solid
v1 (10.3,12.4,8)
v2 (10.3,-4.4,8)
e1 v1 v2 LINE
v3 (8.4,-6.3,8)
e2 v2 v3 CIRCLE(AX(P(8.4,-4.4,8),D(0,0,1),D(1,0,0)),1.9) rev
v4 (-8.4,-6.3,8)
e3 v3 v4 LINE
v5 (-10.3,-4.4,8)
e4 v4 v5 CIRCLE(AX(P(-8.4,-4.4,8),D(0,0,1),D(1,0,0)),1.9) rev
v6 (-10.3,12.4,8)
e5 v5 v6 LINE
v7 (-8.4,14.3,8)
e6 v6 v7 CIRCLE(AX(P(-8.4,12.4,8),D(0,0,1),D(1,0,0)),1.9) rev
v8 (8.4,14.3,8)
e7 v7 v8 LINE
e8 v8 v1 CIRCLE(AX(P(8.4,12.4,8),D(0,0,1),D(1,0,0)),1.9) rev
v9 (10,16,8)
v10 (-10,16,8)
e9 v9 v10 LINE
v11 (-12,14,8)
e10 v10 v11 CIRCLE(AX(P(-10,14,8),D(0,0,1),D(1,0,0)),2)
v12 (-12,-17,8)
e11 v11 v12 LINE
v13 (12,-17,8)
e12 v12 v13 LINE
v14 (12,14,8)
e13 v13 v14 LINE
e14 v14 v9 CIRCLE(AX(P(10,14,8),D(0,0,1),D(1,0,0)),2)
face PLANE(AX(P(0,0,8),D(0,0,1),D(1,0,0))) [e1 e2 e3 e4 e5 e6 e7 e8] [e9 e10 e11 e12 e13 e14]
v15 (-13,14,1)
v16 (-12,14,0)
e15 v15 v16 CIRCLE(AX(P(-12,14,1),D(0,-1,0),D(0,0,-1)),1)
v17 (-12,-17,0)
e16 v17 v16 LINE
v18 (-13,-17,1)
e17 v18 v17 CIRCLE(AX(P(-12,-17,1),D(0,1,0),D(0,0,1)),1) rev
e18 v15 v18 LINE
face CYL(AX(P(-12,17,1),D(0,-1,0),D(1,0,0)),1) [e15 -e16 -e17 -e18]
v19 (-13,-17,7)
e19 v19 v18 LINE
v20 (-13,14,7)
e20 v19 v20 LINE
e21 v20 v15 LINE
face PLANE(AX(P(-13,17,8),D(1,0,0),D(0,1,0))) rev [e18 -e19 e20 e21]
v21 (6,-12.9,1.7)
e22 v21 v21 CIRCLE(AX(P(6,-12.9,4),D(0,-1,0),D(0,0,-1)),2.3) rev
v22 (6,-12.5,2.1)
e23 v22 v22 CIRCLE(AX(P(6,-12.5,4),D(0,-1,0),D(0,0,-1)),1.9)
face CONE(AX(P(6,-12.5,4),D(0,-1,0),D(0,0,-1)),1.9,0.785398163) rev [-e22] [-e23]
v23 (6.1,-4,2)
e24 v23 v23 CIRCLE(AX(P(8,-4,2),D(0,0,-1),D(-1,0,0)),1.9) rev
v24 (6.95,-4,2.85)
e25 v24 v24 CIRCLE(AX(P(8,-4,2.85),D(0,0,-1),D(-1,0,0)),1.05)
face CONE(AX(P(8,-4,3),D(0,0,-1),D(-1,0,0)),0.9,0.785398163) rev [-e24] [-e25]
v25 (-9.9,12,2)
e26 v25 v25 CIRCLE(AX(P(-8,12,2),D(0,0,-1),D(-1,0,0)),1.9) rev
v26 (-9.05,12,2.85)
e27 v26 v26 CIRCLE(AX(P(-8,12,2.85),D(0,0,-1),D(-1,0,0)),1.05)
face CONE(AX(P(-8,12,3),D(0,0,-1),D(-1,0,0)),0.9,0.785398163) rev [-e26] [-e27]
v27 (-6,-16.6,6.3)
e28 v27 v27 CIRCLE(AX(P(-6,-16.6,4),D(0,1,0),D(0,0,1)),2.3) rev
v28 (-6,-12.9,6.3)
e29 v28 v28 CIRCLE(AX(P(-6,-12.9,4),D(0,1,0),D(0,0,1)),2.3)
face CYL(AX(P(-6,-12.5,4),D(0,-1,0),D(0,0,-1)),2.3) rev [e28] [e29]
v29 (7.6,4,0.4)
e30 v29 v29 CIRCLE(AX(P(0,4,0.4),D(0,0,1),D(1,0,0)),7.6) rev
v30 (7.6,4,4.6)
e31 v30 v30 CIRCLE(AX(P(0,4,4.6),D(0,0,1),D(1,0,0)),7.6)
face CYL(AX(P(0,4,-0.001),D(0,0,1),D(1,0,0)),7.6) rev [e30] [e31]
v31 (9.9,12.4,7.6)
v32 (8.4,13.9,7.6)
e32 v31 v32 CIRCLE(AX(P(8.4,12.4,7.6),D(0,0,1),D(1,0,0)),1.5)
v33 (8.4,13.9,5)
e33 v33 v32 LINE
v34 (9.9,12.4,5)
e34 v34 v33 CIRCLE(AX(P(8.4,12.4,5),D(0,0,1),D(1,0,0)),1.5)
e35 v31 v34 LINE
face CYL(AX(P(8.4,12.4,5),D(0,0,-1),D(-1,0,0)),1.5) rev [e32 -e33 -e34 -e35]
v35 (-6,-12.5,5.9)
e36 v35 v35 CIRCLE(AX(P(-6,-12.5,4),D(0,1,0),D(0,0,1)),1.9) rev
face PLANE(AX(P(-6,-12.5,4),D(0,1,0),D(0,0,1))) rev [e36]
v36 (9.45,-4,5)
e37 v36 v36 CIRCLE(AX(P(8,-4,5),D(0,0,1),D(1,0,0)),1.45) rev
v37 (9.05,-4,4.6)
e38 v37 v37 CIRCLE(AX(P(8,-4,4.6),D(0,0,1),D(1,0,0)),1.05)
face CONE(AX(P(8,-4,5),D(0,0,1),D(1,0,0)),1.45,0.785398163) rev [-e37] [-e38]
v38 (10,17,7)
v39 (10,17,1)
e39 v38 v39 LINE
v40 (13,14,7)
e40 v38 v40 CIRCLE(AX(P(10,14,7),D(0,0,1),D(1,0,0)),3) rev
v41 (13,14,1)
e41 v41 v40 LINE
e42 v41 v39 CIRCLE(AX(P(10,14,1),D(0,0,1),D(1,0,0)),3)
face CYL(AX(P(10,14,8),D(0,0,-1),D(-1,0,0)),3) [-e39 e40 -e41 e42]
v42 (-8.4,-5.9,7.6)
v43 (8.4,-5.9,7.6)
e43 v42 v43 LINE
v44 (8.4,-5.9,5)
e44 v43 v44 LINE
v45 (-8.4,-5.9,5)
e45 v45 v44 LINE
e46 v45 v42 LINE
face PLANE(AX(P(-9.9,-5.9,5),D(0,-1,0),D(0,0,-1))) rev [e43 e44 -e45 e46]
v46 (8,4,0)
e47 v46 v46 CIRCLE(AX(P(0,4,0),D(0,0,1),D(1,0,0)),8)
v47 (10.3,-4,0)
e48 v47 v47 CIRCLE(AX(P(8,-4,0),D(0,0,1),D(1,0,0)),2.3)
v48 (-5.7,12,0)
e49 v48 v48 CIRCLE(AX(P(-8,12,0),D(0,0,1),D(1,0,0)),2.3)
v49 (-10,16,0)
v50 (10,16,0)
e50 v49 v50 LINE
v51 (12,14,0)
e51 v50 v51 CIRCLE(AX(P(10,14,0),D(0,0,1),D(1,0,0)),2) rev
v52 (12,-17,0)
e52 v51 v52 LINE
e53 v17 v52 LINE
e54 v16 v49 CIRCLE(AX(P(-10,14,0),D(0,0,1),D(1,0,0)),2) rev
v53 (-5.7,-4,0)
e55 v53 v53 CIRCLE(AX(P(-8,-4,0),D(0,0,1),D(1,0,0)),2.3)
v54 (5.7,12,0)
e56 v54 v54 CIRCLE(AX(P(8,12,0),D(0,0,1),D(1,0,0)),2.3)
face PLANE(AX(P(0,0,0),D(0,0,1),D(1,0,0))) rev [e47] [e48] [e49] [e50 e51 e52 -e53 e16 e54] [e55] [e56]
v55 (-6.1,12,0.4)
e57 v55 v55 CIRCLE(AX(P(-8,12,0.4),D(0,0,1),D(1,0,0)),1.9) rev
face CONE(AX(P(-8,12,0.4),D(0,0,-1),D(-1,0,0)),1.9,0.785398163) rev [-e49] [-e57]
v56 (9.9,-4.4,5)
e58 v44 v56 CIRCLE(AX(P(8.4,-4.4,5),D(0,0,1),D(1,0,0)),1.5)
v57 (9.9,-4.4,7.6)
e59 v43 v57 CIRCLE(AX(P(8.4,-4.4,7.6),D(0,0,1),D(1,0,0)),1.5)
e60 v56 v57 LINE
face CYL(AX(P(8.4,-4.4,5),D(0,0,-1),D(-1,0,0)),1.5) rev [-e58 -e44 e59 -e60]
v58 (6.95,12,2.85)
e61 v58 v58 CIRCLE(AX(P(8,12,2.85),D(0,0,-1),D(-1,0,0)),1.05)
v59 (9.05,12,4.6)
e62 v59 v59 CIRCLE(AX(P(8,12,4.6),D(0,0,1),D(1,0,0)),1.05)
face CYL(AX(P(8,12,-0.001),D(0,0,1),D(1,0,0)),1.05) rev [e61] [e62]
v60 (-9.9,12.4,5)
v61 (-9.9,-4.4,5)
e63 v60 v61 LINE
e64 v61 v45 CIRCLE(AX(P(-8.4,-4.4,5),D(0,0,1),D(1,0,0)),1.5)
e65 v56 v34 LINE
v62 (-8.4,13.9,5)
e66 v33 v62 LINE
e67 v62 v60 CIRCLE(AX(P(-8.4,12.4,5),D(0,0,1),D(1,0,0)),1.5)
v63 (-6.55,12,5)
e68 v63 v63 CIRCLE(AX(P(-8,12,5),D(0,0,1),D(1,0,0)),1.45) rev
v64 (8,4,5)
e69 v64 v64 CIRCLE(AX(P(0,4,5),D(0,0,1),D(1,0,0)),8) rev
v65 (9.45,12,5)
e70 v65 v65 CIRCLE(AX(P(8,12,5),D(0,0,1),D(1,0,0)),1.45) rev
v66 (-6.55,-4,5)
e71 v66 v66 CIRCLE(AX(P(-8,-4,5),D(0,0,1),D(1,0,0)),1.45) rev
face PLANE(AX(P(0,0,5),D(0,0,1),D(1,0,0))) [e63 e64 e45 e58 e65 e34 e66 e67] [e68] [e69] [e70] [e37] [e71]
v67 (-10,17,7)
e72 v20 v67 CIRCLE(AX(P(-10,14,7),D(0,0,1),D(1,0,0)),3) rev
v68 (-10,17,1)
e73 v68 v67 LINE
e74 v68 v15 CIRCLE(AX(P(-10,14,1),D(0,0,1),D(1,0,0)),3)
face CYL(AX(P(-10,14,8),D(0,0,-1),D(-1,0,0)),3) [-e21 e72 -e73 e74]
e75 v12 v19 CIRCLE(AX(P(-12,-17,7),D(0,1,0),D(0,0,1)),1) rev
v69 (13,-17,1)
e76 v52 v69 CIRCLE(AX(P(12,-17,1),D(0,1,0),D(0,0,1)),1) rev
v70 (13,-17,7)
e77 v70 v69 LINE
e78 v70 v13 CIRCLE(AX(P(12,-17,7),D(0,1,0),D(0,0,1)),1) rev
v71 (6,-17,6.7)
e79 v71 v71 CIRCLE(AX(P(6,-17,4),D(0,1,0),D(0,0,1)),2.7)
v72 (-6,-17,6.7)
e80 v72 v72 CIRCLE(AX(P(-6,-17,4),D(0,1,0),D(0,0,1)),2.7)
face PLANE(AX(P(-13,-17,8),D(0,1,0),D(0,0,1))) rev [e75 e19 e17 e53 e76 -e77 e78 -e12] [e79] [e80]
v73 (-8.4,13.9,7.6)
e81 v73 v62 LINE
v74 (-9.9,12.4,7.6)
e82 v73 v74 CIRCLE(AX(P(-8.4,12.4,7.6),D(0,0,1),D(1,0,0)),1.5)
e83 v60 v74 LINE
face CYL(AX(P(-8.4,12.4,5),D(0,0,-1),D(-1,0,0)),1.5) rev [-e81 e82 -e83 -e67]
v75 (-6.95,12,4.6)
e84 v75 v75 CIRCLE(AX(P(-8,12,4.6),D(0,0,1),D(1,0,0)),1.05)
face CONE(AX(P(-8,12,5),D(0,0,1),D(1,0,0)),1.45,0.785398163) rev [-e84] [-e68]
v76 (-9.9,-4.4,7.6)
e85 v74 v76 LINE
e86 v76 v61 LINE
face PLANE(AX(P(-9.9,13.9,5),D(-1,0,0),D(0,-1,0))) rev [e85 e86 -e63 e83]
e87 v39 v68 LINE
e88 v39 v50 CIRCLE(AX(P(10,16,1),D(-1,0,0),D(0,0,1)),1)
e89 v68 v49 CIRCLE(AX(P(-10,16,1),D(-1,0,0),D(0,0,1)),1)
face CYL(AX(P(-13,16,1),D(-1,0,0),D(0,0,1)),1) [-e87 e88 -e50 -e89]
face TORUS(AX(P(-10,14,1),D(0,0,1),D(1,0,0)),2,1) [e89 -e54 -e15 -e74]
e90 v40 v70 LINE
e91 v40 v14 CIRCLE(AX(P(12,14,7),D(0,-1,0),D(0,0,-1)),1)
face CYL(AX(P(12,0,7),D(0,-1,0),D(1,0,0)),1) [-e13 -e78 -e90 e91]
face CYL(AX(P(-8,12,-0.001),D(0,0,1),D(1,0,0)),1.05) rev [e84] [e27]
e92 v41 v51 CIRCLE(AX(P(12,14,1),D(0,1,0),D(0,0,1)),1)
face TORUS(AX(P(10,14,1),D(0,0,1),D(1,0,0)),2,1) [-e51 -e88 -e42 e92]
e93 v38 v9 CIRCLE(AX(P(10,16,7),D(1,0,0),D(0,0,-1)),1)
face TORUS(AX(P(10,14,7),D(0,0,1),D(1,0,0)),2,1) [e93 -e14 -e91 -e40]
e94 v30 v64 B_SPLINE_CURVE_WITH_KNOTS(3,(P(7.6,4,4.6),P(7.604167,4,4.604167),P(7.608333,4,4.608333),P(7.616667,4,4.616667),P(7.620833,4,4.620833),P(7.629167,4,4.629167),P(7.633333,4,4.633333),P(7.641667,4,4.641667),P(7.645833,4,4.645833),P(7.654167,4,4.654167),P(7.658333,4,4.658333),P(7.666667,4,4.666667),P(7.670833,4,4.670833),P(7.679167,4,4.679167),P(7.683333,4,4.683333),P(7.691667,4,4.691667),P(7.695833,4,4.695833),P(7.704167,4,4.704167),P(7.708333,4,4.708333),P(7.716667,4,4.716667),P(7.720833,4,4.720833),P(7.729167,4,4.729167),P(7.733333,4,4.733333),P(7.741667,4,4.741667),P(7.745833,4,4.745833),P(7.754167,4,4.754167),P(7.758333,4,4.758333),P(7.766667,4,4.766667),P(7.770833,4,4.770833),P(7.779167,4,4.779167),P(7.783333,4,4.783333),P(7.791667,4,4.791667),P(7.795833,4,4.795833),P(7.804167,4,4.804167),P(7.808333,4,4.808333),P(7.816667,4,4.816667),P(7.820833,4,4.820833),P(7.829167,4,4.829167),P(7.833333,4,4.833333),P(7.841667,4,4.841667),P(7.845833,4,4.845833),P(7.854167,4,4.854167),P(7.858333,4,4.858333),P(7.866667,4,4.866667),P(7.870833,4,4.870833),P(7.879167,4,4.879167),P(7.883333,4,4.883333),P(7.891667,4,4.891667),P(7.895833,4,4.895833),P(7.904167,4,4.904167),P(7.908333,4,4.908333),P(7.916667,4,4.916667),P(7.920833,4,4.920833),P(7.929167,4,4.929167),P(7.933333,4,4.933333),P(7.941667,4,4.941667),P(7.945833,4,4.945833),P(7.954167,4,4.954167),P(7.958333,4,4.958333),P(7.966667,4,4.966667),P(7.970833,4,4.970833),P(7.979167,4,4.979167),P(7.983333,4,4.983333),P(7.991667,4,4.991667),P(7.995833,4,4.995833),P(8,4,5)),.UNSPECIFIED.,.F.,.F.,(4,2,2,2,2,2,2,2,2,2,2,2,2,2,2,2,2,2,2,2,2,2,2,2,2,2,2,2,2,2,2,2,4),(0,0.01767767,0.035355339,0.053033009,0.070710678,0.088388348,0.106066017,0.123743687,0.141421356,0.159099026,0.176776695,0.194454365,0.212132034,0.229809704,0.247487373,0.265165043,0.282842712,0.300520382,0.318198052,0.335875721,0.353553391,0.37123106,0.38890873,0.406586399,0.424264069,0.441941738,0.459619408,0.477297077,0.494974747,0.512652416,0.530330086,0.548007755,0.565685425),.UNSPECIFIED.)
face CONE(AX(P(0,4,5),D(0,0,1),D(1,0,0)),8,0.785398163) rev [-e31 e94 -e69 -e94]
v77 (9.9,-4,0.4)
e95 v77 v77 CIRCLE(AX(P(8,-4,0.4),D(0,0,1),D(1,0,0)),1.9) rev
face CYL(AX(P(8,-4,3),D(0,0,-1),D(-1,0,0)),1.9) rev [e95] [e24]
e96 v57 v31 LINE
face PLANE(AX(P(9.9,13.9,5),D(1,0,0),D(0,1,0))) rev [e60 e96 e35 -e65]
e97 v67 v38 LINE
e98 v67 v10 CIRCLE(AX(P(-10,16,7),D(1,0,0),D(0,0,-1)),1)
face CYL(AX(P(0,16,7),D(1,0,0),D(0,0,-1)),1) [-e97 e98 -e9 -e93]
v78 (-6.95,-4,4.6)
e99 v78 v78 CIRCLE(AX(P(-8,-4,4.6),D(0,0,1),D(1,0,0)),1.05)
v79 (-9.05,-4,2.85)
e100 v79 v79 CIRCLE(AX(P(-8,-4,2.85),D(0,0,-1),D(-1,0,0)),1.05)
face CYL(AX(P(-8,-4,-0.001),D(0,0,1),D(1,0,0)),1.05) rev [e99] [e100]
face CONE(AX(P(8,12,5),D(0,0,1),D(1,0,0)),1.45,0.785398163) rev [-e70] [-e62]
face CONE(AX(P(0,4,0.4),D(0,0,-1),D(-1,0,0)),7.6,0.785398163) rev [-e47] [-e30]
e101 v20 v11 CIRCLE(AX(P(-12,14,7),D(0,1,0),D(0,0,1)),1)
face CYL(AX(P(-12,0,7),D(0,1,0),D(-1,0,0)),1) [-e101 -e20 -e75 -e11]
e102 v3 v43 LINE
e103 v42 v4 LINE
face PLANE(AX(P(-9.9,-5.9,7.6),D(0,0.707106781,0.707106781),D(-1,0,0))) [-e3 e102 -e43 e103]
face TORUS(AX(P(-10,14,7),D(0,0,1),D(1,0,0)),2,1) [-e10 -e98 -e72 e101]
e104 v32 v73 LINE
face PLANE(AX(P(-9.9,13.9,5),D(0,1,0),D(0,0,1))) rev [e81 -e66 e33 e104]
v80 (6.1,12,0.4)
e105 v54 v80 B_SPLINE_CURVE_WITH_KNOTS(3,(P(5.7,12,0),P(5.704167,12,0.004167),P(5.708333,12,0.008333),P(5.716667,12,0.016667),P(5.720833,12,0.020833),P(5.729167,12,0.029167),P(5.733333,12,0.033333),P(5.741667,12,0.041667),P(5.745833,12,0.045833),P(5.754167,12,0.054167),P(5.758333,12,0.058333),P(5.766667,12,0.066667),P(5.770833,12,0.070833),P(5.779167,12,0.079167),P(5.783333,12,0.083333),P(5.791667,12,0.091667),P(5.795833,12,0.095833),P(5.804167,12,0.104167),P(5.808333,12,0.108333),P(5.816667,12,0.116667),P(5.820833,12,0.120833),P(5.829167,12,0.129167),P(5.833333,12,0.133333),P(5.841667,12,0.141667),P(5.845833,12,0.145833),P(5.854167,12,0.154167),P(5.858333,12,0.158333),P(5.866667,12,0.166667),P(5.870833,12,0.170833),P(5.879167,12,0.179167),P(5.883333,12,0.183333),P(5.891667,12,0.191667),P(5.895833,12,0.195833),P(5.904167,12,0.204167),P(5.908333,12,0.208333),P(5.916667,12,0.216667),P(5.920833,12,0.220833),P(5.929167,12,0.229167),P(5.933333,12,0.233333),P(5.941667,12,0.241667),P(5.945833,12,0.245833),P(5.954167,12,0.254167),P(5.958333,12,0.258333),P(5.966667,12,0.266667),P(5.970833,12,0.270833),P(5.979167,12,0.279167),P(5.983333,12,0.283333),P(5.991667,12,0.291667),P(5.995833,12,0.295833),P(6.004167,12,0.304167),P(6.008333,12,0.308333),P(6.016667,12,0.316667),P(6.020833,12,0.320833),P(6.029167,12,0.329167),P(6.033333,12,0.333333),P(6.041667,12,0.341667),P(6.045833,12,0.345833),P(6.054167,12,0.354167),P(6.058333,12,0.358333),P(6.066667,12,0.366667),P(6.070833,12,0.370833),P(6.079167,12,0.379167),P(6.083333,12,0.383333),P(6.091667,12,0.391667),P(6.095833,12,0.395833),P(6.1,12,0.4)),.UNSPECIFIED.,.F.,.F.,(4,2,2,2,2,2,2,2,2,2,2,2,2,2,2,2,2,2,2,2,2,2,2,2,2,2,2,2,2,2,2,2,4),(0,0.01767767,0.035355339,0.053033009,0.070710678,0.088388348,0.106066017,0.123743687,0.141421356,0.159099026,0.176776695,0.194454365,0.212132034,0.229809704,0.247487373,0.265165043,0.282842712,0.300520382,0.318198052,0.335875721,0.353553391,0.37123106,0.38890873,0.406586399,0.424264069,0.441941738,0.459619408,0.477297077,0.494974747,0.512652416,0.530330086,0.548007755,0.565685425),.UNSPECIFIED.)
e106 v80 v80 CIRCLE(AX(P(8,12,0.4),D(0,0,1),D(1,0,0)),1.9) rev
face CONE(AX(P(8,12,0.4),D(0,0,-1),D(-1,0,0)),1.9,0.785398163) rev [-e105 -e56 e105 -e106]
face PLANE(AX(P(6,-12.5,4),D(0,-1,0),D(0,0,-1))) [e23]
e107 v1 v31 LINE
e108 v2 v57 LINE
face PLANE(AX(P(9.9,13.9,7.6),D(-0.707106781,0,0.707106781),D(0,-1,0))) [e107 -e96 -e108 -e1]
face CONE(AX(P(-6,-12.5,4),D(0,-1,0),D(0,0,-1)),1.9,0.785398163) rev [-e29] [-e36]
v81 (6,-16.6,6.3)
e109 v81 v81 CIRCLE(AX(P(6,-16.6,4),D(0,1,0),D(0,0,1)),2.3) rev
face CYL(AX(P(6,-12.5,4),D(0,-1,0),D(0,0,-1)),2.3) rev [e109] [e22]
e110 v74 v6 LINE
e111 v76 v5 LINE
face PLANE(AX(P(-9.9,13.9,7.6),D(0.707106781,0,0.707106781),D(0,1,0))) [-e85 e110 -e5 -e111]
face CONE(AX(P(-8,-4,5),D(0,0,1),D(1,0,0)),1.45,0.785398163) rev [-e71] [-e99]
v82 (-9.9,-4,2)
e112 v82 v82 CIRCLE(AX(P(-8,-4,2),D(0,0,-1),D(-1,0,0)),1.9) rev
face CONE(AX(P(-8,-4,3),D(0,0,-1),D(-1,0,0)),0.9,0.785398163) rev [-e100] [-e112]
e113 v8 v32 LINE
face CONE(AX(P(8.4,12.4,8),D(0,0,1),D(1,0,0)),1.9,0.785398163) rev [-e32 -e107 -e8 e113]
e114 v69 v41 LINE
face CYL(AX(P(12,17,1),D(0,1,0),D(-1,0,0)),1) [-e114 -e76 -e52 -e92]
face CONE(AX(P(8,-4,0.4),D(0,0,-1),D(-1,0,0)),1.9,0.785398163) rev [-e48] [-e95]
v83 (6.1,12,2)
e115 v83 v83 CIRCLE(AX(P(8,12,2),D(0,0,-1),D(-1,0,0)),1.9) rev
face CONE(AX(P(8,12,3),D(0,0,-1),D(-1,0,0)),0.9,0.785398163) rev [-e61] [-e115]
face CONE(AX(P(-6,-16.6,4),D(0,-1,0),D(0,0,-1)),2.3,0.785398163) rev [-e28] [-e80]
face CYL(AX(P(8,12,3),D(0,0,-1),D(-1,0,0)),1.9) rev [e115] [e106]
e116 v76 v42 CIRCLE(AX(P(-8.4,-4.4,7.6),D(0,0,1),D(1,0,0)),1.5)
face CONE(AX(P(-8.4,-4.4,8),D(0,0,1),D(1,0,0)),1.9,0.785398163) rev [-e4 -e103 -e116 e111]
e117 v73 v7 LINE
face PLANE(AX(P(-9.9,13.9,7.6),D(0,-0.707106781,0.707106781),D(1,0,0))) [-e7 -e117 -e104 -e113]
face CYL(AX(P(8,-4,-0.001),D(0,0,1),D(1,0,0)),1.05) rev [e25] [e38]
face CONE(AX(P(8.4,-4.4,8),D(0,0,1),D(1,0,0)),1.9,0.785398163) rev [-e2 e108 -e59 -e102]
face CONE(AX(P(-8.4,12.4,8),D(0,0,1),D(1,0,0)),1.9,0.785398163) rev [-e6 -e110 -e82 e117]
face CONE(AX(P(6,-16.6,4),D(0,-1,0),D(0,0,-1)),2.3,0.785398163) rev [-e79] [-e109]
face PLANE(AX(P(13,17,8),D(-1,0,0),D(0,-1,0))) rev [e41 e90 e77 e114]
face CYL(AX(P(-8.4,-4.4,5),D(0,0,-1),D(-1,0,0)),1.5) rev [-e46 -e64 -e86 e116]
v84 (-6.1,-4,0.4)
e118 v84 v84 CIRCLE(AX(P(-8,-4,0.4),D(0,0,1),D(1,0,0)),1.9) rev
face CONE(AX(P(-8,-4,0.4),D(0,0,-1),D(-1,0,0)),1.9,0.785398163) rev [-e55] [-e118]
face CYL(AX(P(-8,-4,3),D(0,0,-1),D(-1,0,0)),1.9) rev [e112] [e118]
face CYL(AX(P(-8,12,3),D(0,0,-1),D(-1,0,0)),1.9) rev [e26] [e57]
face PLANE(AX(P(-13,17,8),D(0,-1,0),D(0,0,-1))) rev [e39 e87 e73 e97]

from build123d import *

# Parameters (mm, degrees)
SKETCH1_W           = 26
SKETCH1_H           = 34
BOSS_EXTRUDE1_DEPTH = 8
CUT_EXTRUDE1_REACH  = 24.847
SKETCH2_R           = 7.6
SKETCH2_R_2         = 1.05
SKETCH5_R           = 2.3
CUT_EXTRUDE7_DEPTH  = 4.5
SKETCH6_W           = 19.8
SKETCH6_H           = 19.8
CUT_EXTRUDE8_DEPTH  = 3
SKETCH7_R           = 1.9
CUT_EXTRUDE9_DEPTH  = 3
FILLET1_R           = 3
CHAMFER3_SIZE       = 0.4
FILLET2_R           = 1.5
CHAMFER7_SIZE       = 1
CHAMFER9_SIZE       = 0.4
CHAMFER10_SIZE      = 0.4
FILLET4_R           = 1


with BuildPart() as part:
    # Sketch1 → Boss-Extrude1 (new body)
    with BuildSketch(Plane.XY):
        Rectangle(SKETCH1_W, SKETCH1_H)
    extrude(amount=BOSS_EXTRUDE1_DEPTH)

    # Sketch2 → Cut-Extrude1 (cut, up to next)
    with BuildSketch(Plane.XY.offset(8), mode=Mode.PRIVATE) as cut_extrude1_sk1:
        with Locations((0, 4)):
            Circle(SKETCH2_R)
    cut_extrude1_tool1 = extrude(cut_extrude1_sk1.sketch, amount=-CUT_EXTRUDE1_REACH, mode=Mode.PRIVATE) & part.part
    # Sketch2 → Cut-Extrude1 (cut, up to next)
    with BuildSketch(Plane.XY.offset(8), mode=Mode.PRIVATE) as cut_extrude1_sk2:
        with Locations((-8, 12)):
            Circle(SKETCH2_R_2)
    cut_extrude1_tool2 = extrude(cut_extrude1_sk2.sketch, amount=-CUT_EXTRUDE1_REACH, mode=Mode.PRIVATE) & part.part
    # Sketch2 → Cut-Extrude1 (cut, up to next)
    with BuildSketch(Plane.XY.offset(8), mode=Mode.PRIVATE) as cut_extrude1_sk3:
        with Locations((8, 12)):
            Circle(SKETCH2_R_2)
    cut_extrude1_tool3 = extrude(cut_extrude1_sk3.sketch, amount=-CUT_EXTRUDE1_REACH, mode=Mode.PRIVATE) & part.part
    # Sketch2 → Cut-Extrude1 (cut, up to next)
    with BuildSketch(Plane.XY.offset(8), mode=Mode.PRIVATE) as cut_extrude1_sk4:
        with Locations((8, -4)):
            Circle(SKETCH2_R_2)
    cut_extrude1_tool4 = extrude(cut_extrude1_sk4.sketch, amount=-CUT_EXTRUDE1_REACH, mode=Mode.PRIVATE) & part.part
    # Sketch2 → Cut-Extrude1 (cut, up to next)
    with BuildSketch(Plane.XY.offset(8), mode=Mode.PRIVATE) as cut_extrude1_sk5:
        with Locations((-8, -4)):
            Circle(SKETCH2_R_2)
    cut_extrude1_tool5 = extrude(cut_extrude1_sk5.sketch, amount=-CUT_EXTRUDE1_REACH, mode=Mode.PRIVATE) & part.part
    add(cut_extrude1_tool1.solids().sort_by_distance((0, 4, 8))[0], mode=Mode.SUBTRACT)
    add(cut_extrude1_tool2.solids().sort_by_distance((-8, 12, 8))[0], mode=Mode.SUBTRACT)
    add(cut_extrude1_tool3.solids().sort_by_distance((8, 12, 8))[0], mode=Mode.SUBTRACT)
    add(cut_extrude1_tool4.solids().sort_by_distance((8, -4, 8))[0], mode=Mode.SUBTRACT)
    add(cut_extrude1_tool5.solids().sort_by_distance((-8, -4, 8))[0], mode=Mode.SUBTRACT)

    # Sketch5 → Cut-Extrude7 (cut)
    with BuildSketch(Plane.XZ.offset(17)):
        with Locations(Location((6, 4, 0), (0, 0, 270))):
            Circle(SKETCH5_R)
        with Locations(Location((-6, 4, 0), (0, 0, 90))):
            Circle(SKETCH5_R)
    extrude(amount=-CUT_EXTRUDE7_DEPTH, mode=Mode.SUBTRACT)

    # Sketch6 → Cut-Extrude8 (cut)
    with BuildSketch(Plane.XY.offset(8)):
        with Locations((0, 4)):
            Rectangle(SKETCH6_W, SKETCH6_H)
    extrude(amount=-CUT_EXTRUDE8_DEPTH, mode=Mode.SUBTRACT)

    # Sketch7 → Cut-Extrude9 (cut)
    with BuildSketch(Plane(origin=(0, 0, 0), x_dir=(-1, 0, 0), z_dir=(0, 0, -1))):
        with Locations((-8, 12)):
            Circle(SKETCH7_R)
        with Locations((8, 12)):
            Circle(SKETCH7_R)
        with Locations((-8, -4)):
            Circle(SKETCH7_R)
        with Locations((8, -4)):
            Circle(SKETCH7_R)
    extrude(amount=-CUT_EXTRUDE9_DEPTH, mode=Mode.SUBTRACT)

    # Fillet1
    fillet1_edges = [part.edges().sort_by_distance(p)[0] for p in [
        (-13, 17, 4),
        (13, 17, 4),
    ]]
    fillet(fillet1_edges, radius=FILLET1_R)

    # Chamfer3
    chamfer3_edges = [part.edges().sort_by_distance(p)[0] for p in [
        (6, -12.5, 6.3),
        (6, -17, 6.3),
        (-6, -12.5, 1.7),
        (-6, -17, 1.7),
    ]]
    chamfer(chamfer3_edges, length=CHAMFER3_SIZE)

    # Fillet2
    fillet2_edges = [part.edges().sort_by_distance(p)[0] for p in [
        (9.9, 13.9, 6.5),
        (9.9, -5.9, 6.5),
        (-9.9, -5.9, 6.5),
        (-9.9, 13.9, 6.5),
    ]]
    fillet(fillet2_edges, radius=FILLET2_R)

    # Chamfer7
    # the kernel refuses this chamfer: 1 mm, written as the material it adds along each edge
    with BuildSketch(Plane(origin=(-8, 12, 3), x_dir=(-1, 0, 0), z_dir=(0, -1, 0))) as chamfer7_piece_1_section:
        Polygon((1.9, CHAMFER7_SIZE), (1.9 - CHAMFER7_SIZE, 0), (1.9, 0), align=None)
    chamfer7_piece_1 = revolve(axis=Axis((-8, 12, 3), (0, 0, -1)), mode=Mode.PRIVATE)
    chamfer7_piece_1 = chamfer7_piece_1 - Plane(origin=(-8, 12, 2.4231984), x_dir=(1, 0, 0), z_dir=(0, 0, 1)) * Cylinder(1.05, 8, mode=Mode.PRIVATE)
    add(chamfer7_piece_1)
    with BuildSketch(Plane(origin=(8, 12, 3), x_dir=(-1, 0, 0), z_dir=(0, -1, 0))) as chamfer7_piece_2_section:
        Polygon((1.9, CHAMFER7_SIZE), (1.9 - CHAMFER7_SIZE, 0), (1.9, 0), align=None)
    chamfer7_piece_2 = revolve(axis=Axis((8, 12, 3), (0, 0, -1)), mode=Mode.PRIVATE)
    chamfer7_piece_2 = chamfer7_piece_2 - Plane(origin=(8, 12, 2.4231984), x_dir=(1, 0, 0), z_dir=(0, 0, 1)) * Cylinder(1.05, 8, mode=Mode.PRIVATE)
    add(chamfer7_piece_2)
    with BuildSketch(Plane(origin=(8, -4, 3), x_dir=(-1, 0, 0), z_dir=(0, -1, 0))) as chamfer7_piece_3_section:
        Polygon((1.9, CHAMFER7_SIZE), (1.9 - CHAMFER7_SIZE, 0), (1.9, 0), align=None)
    chamfer7_piece_3 = revolve(axis=Axis((8, -4, 3), (0, 0, -1)), mode=Mode.PRIVATE)
    chamfer7_piece_3 = chamfer7_piece_3 - Plane(origin=(8, -4, 2.4231984), x_dir=(1, 0, 0), z_dir=(0, 0, 1)) * Cylinder(1.05, 8, mode=Mode.PRIVATE)
    add(chamfer7_piece_3)
    with BuildSketch(Plane(origin=(-8, -4, 3), x_dir=(-1, 0, 0), z_dir=(0, -1, 0))) as chamfer7_piece_4_section:
        Polygon((1.9, CHAMFER7_SIZE), (1.9 - CHAMFER7_SIZE, 0), (1.9, 0), align=None)
    chamfer7_piece_4 = revolve(axis=Axis((-8, -4, 3), (0, 0, -1)), mode=Mode.PRIVATE)
    chamfer7_piece_4 = chamfer7_piece_4 - Plane(origin=(-8, -4, 2.4231984), x_dir=(1, 0, 0), z_dir=(0, 0, 1)) * Cylinder(1.05, 8, mode=Mode.PRIVATE)
    add(chamfer7_piece_4)

    # Chamfer9
    chamfer9_edges = [part.edges().sort_by_distance(p)[0] for p in [
        (0, -5.9, 8),
        (-9.9, 4, 8),
        (9.9, 4, 8),
        (0, 13.9, 8),
        (-9.460660172, -5.460660172, 8),
        (9.460660172, -5.460660172, 8),
        (9.460660172, 13.460660172, 8),
        (-9.460660172, 13.460660172, 8),
        (-7.6, 4, 0),
        (-7.6, 4, 5),
        (-6.1, 12, 0),
        (9.9, -4, 0),
        (-6.1, -4, 0),
        (9.9, 12, 0),
    ]]
    chamfer(chamfer9_edges, length=CHAMFER9_SIZE)

    # Chamfer10
    chamfer10_edges = [part.edges().sort_by_distance(p)[0] for p in [
        (-9.05, 12, 5),
        (6.95, 12, 5),
        (6.95, -4, 5),
        (-9.05, -4, 5),
    ]]
    chamfer(chamfer10_edges, length=CHAMFER10_SIZE)

    # Fillet4
    fillet4_edges = [part.edges().sort_by_distance(p)[0] for p in [
        (13, -1.5, 8),
        (13, -1.5, 0),
        (0, 17, 0),
        (0, 17, 8),
        (-13, -1.5, 0),
        (-12.121320344, 16.121320344, 0),
        (12.121320344, 16.121320344, 0),
        (-13, -1.5, 8),
        (-12.121320344, 16.121320344, 8),
        (12.121320344, 16.121320344, 8),
    ]]
    fillet(fillet4_edges, radius=FILLET4_R)


solid = part.part
